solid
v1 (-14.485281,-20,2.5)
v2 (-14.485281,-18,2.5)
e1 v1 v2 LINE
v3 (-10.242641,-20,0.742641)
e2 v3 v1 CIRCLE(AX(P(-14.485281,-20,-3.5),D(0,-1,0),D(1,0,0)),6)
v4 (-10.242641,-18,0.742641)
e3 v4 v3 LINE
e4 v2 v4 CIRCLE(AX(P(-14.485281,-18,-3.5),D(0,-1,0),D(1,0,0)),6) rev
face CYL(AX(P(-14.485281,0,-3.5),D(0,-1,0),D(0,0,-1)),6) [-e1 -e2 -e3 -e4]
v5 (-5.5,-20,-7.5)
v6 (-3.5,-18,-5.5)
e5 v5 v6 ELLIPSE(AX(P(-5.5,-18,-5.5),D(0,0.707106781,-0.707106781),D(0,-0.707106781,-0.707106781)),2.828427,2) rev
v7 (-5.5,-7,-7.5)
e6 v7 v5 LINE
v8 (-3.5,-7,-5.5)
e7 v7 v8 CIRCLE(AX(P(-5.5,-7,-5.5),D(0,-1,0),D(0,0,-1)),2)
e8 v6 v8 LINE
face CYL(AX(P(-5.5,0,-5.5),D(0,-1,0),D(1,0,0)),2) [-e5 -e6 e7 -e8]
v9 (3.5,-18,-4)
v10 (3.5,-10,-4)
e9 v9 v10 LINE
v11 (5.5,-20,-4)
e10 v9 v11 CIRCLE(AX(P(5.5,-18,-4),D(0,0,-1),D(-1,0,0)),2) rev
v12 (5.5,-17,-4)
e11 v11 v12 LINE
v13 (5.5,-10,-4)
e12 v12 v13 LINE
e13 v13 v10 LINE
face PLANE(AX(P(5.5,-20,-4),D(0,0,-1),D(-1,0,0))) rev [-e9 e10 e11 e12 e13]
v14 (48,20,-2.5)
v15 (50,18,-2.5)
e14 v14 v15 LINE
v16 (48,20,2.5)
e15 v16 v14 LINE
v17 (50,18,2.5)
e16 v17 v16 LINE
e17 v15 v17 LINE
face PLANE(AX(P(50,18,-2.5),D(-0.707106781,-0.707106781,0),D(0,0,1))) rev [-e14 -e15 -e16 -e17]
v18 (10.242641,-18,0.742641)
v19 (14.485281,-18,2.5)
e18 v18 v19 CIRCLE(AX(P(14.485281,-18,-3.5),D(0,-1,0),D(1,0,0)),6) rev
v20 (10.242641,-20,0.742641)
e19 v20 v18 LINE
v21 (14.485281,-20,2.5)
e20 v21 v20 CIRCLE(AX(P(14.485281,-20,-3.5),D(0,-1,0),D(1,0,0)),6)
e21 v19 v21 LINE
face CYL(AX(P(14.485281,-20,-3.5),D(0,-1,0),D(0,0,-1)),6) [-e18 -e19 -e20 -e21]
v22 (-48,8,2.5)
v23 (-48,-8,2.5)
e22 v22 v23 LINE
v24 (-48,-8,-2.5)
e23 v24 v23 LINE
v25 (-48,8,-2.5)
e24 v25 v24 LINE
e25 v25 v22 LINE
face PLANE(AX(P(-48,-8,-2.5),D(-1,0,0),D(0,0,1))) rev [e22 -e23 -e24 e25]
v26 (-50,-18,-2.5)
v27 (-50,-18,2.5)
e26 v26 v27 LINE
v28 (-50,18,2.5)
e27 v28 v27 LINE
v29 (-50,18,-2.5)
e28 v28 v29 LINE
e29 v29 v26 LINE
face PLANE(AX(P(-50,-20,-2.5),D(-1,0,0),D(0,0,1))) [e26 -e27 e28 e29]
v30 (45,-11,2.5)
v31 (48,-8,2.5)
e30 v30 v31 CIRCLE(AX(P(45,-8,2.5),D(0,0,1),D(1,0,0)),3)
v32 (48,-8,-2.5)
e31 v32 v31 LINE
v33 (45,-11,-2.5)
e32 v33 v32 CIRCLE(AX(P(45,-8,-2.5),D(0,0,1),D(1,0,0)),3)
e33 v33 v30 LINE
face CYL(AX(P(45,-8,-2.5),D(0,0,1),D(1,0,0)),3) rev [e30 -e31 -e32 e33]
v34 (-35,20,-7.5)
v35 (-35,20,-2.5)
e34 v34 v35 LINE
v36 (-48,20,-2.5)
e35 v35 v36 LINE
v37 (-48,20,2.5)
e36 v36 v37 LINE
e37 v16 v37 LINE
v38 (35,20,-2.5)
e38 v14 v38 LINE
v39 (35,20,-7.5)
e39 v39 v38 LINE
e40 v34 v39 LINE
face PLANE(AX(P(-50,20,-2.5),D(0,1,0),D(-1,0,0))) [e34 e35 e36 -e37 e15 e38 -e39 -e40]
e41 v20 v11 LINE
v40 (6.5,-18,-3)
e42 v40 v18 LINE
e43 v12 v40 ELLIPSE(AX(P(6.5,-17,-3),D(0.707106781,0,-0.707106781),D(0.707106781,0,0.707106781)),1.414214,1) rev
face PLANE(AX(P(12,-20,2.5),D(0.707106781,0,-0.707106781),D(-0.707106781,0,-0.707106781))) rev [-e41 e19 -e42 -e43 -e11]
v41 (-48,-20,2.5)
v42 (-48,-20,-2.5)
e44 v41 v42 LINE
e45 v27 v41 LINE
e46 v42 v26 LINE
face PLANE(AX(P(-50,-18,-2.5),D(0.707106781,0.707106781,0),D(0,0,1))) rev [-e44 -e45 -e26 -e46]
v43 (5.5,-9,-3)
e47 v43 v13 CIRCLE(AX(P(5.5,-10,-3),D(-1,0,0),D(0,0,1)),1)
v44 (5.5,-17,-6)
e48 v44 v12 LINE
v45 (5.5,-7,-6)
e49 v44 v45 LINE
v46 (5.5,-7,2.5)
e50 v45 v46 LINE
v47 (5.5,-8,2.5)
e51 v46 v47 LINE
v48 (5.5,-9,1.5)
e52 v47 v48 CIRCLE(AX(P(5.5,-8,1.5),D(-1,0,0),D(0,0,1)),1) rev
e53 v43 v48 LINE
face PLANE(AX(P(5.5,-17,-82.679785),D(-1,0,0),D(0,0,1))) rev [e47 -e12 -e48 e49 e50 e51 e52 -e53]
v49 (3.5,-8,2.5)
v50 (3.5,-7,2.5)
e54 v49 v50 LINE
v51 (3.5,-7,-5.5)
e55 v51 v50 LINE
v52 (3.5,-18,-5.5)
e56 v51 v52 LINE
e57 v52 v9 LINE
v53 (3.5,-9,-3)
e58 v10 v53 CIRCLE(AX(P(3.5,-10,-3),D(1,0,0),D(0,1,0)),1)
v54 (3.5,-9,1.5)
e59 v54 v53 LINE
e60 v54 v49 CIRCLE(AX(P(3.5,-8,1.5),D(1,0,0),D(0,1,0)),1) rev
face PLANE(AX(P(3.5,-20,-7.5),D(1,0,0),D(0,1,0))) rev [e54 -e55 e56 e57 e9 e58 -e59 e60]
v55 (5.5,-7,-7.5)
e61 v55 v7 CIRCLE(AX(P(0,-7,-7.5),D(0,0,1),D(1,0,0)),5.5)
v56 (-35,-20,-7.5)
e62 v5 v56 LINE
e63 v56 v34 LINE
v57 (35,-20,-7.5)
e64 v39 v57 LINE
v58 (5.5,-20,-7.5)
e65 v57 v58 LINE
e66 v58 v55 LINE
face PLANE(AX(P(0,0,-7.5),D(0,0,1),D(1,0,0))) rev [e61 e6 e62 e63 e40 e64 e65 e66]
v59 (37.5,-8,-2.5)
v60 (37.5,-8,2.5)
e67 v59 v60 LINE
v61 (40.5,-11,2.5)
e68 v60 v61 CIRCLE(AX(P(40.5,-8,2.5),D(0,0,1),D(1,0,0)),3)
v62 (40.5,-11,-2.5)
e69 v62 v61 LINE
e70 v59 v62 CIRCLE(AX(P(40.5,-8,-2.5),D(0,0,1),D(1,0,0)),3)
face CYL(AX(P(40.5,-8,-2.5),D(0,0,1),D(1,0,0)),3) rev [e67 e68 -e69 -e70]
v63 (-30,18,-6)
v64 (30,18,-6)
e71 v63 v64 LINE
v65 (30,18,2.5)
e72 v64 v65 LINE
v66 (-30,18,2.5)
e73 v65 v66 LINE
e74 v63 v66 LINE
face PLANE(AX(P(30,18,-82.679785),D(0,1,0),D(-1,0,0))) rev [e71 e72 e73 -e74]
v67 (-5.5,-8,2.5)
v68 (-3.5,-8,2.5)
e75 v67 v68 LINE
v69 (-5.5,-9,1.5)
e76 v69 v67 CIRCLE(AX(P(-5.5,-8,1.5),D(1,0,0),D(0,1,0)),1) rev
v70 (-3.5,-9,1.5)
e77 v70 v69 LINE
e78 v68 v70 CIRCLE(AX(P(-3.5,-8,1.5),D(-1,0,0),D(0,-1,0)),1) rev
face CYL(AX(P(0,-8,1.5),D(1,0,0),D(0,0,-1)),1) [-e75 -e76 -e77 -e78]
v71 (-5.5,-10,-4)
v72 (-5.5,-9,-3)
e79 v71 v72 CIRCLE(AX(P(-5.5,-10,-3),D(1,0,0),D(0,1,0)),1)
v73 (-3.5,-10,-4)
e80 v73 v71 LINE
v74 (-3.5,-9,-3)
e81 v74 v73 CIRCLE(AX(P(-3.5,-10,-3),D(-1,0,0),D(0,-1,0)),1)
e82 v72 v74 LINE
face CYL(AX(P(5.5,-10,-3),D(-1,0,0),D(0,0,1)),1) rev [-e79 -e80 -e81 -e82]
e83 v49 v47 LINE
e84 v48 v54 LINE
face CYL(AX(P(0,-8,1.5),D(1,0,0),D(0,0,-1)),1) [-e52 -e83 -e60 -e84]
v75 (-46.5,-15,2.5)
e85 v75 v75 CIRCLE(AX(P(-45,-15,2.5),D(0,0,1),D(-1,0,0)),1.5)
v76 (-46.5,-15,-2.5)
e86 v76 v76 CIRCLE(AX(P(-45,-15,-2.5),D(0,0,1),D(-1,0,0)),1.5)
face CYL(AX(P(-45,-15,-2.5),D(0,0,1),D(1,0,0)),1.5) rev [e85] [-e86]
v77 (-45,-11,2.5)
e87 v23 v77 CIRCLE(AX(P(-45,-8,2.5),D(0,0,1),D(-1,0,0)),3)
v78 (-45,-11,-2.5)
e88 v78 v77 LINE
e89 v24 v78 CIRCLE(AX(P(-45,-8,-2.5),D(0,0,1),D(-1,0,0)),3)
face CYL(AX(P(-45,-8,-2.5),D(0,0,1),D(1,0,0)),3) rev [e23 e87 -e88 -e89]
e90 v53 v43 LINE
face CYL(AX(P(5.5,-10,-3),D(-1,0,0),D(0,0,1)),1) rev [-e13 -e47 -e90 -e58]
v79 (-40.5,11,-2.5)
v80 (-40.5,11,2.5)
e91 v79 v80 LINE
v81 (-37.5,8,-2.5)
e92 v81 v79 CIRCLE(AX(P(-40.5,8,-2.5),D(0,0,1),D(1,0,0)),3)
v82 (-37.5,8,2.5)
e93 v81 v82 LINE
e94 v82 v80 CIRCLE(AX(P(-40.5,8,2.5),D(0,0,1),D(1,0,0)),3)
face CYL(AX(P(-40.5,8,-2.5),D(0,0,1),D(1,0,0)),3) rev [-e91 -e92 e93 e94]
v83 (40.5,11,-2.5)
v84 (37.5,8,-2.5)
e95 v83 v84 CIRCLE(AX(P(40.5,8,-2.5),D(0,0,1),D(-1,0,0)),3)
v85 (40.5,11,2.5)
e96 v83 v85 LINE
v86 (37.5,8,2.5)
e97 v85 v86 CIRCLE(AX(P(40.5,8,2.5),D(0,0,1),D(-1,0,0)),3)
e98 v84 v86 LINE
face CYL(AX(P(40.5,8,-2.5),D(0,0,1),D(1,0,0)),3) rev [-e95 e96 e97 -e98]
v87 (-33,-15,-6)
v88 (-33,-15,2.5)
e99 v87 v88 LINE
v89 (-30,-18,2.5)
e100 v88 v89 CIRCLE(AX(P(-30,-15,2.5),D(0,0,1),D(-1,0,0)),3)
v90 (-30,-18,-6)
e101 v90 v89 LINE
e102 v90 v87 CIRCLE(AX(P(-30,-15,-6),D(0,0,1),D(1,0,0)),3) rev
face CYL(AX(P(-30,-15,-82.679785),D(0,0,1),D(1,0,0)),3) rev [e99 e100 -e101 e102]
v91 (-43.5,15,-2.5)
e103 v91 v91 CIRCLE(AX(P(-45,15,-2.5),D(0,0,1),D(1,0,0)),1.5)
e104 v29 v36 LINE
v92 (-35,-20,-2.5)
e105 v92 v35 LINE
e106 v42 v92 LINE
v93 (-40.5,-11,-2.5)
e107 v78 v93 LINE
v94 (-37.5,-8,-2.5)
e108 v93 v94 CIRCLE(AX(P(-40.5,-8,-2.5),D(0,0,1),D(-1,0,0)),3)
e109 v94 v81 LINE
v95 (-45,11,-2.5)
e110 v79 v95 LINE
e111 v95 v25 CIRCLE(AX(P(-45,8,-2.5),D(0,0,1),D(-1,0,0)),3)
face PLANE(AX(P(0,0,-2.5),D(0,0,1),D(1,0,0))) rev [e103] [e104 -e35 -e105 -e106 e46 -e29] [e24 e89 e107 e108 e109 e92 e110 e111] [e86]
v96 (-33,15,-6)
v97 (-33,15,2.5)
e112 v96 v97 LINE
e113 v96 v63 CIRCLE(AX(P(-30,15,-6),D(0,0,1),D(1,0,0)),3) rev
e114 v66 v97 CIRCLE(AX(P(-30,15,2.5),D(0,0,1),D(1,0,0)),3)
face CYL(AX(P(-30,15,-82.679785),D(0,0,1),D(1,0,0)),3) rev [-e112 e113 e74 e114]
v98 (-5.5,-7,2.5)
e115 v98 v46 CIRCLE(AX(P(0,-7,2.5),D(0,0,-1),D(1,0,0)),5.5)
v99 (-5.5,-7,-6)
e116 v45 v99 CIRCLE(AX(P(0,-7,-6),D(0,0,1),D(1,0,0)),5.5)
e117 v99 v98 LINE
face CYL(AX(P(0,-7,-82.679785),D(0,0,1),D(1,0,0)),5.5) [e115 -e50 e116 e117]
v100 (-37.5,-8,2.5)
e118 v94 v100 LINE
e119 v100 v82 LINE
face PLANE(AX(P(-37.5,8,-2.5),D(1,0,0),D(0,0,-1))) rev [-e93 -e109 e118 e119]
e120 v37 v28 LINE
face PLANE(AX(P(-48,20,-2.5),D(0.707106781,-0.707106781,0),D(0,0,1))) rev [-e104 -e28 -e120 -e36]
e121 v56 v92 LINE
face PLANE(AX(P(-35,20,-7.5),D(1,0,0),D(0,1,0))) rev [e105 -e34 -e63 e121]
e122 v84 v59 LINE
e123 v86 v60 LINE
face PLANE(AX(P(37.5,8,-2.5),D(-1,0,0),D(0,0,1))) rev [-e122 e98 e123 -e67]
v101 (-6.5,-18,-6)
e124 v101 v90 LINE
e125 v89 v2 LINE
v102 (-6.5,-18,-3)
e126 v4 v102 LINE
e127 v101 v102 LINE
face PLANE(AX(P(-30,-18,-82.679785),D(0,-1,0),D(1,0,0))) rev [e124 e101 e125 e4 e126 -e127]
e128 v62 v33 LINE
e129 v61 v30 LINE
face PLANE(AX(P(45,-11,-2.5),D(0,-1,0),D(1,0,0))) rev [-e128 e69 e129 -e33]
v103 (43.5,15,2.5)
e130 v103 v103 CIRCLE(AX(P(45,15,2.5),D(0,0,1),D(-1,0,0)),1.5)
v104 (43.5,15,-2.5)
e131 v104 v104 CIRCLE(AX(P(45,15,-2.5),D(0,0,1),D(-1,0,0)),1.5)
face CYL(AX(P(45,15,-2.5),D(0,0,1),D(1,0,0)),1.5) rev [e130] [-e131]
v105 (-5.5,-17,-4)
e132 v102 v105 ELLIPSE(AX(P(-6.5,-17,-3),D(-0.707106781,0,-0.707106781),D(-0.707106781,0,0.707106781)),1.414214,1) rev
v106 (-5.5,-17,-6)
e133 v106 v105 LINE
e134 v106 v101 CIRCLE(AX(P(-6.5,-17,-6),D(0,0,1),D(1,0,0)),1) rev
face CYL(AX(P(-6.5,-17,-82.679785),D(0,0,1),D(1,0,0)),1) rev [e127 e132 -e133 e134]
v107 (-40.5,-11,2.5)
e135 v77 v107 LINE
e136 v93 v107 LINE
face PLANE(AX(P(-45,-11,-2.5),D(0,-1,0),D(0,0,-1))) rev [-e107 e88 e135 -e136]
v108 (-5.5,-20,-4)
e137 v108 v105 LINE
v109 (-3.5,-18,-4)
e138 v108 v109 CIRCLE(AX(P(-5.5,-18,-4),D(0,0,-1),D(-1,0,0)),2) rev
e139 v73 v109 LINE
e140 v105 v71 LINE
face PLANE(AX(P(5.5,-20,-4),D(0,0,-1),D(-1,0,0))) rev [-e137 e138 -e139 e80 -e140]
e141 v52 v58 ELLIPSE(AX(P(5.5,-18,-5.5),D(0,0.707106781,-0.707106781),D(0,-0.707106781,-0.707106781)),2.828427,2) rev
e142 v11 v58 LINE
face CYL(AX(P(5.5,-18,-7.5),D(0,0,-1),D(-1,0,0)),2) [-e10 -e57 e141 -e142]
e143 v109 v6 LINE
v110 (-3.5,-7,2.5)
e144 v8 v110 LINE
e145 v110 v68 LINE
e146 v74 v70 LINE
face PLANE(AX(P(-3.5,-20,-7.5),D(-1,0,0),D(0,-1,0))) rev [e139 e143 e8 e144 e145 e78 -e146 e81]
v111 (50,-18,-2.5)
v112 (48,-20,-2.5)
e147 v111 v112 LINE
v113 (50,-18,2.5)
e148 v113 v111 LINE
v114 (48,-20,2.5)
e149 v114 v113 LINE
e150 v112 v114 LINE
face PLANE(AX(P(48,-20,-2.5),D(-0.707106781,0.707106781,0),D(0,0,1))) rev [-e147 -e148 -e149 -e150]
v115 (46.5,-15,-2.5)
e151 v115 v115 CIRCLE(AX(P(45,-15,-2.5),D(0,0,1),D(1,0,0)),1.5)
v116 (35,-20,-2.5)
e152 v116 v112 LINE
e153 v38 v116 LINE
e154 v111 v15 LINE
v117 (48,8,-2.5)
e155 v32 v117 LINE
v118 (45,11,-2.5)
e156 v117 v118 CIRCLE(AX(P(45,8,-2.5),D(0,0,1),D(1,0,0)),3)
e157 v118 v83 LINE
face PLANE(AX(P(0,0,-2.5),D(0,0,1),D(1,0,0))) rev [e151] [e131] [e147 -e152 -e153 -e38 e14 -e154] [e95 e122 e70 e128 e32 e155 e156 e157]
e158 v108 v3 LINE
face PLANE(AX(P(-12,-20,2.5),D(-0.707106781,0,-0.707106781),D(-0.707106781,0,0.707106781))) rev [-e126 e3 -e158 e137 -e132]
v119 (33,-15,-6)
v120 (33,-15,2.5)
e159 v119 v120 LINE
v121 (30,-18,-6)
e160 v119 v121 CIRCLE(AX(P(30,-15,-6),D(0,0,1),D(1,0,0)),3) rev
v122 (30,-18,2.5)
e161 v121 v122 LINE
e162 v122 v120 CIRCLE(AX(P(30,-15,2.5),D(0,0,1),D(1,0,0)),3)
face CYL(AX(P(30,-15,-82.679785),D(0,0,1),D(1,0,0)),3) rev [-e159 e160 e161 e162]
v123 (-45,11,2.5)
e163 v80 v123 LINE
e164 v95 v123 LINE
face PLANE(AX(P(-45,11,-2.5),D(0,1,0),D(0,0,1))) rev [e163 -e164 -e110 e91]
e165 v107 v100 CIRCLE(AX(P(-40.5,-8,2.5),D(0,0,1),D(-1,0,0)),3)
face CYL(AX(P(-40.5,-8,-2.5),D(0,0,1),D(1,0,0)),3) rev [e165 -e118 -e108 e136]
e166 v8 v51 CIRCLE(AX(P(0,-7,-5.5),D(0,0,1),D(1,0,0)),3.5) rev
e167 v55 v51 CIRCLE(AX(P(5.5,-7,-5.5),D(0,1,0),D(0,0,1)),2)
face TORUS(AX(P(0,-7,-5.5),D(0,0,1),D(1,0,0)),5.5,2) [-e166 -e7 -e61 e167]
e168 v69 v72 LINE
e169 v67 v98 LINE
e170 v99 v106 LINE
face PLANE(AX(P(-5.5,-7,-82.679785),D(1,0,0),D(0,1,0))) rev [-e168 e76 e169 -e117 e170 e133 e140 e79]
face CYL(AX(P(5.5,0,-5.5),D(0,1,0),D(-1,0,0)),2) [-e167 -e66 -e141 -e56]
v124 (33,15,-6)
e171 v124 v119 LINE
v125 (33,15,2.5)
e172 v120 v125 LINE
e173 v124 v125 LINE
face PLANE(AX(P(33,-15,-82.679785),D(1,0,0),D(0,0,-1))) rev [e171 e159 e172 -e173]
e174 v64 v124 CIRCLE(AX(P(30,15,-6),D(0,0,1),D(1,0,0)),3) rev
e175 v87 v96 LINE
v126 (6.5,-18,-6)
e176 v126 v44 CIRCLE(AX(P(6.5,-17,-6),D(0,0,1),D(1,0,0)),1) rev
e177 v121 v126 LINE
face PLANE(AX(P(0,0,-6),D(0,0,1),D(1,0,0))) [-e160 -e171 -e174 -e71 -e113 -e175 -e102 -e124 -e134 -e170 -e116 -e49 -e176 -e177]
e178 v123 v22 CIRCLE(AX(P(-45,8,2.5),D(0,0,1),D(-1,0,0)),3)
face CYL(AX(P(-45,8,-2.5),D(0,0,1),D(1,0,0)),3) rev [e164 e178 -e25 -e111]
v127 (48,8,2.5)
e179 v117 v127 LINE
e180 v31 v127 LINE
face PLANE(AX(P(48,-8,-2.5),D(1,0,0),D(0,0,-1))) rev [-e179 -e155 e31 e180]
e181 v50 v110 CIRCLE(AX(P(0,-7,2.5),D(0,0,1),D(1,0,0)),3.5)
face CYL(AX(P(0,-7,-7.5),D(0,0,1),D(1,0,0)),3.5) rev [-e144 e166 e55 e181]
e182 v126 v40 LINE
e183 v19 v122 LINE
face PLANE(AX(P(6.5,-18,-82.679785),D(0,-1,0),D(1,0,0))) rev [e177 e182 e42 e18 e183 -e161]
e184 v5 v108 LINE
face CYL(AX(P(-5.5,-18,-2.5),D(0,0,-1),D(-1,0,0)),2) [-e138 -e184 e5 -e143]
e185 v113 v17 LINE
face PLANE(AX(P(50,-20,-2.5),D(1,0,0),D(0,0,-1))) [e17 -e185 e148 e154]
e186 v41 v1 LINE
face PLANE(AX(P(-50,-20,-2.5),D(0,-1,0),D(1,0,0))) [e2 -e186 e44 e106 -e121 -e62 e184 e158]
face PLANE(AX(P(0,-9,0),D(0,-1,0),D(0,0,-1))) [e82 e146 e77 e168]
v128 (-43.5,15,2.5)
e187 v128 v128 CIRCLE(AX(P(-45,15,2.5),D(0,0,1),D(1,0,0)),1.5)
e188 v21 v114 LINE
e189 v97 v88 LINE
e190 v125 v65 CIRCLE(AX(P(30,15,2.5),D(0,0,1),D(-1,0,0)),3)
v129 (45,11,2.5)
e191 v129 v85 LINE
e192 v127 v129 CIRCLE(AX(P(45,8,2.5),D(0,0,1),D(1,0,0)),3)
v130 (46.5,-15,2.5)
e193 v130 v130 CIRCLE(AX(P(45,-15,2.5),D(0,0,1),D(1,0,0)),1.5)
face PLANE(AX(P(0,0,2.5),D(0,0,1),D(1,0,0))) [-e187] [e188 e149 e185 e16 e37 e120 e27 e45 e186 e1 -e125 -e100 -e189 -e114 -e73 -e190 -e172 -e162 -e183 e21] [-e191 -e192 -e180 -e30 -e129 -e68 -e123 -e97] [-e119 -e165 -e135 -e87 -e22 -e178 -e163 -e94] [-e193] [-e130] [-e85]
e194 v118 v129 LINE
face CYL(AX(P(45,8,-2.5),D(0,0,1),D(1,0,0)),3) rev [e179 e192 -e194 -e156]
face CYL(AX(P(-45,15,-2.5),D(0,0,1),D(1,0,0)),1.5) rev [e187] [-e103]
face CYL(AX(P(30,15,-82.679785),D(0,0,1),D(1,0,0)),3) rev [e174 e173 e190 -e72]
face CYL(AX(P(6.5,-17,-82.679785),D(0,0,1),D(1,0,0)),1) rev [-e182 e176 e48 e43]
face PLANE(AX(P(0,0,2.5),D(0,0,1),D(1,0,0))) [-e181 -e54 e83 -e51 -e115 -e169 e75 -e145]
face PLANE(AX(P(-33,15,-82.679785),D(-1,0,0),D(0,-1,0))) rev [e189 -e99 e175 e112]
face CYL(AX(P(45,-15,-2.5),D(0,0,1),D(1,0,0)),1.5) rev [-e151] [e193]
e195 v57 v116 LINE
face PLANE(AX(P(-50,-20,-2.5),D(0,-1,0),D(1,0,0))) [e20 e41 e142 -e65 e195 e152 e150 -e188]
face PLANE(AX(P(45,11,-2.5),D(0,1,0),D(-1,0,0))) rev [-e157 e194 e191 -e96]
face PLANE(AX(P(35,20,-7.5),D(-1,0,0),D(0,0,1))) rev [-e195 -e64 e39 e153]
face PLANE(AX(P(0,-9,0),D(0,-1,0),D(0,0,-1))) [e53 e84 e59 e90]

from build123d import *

# Parameters (mm, degrees)
AUFSATZ_LINEAR_AUSTRAGEN1_DEPTH      = 2.5
AUFSATZ_LINEAR_AUSTRAGEN1_DEPTH_BACK = 2.5
SKIZZE1_W                            = 100
SKIZZE1_H                            = 40
SCHNITT_LINEAR_AUSTRAGEN1_DEPTH      = 54.909646632
SCHNITT_LINEAR_AUSTRAGEN1_DEPTH_BACK = 54.909646632
SKIZZE2_R                            = 1.5
SCHNITT_LINEAR_AUSTRAGEN2_DEPTH      = 54.909646632
SCHNITT_LINEAR_AUSTRAGEN2_DEPTH_BACK = 54.909646632
SKIZZE7_W                            = 70
SKIZZE7_H                            = 40
AUFSATZ_LINEAR_AUSTRAGEN3_DEPTH      = 5
FASE1_SIZE                           = 2
SCHNITT_LINEAR_AUSTRAGEN7_DEPTH      = 55.371407927
SCHNITT_LINEAR_AUSTRAGEN7_DEPTH_BACK = 55.371407927
VERRUNDUNG1_R                        = 2
SCHNITT_LINEAR_AUSTRAGEN6_DEPTH      = 8.5
VERRUNDUNG2_R                        = 2
SCHNITT_LINEAR_AUSTRAGEN8_DEPTH      = 59.285933123
VERRUNDUNG3_R                        = 1
VERRUNDUNG4_R                        = 6


with BuildPart() as part:
    # Skizze1 → Aufsatz-Linear austragen1 (new, two sides: drawn at the far end of the back side and taken through both)
    with BuildSketch(Plane.XY.offset(-AUFSATZ_LINEAR_AUSTRAGEN1_DEPTH_BACK)):
        Rectangle(SKIZZE1_W, SKIZZE1_H)
    extrude(amount=AUFSATZ_LINEAR_AUSTRAGEN1_DEPTH + AUFSATZ_LINEAR_AUSTRAGEN1_DEPTH_BACK)

    # Skizze2 → Schnitt-Linear austragen1 (cut, two sides: drawn at the far end of the back side and taken through both)
    with BuildSketch(Plane.XY.offset(-SCHNITT_LINEAR_AUSTRAGEN1_DEPTH_BACK)):
        with Locations((-45, 15)):
            Circle(SKIZZE2_R)
        with Locations(Location((-45, -15, 0), (0, 0, 180))):
            Circle(SKIZZE2_R)
        with Locations((45, -15)):
            Circle(SKIZZE2_R)
        with Locations(Location((45, 15, 0), (0, 0, 180))):
            Circle(SKIZZE2_R)
    extrude(amount=SCHNITT_LINEAR_AUSTRAGEN1_DEPTH + SCHNITT_LINEAR_AUSTRAGEN1_DEPTH_BACK, mode=Mode.SUBTRACT)

    # Skizze4 → Schnitt-Linear austragen2 (cut, two sides: drawn at the far end of the back side and taken through both)
    with BuildSketch(Plane.XY.offset(-SCHNITT_LINEAR_AUSTRAGEN2_DEPTH_BACK)):
        with BuildLine():
            Line((-48, -8), (-48, 8))
            ThreePointArc((-48, 8), (-47.121320344, 10.121320344), (-45, 11))
            Line((-45, 11), (-40.5, 11))
            ThreePointArc((-40.5, 11), (-38.378679656, 10.121320344), (-37.5, 8))
            Line((-37.5, 8), (-37.5, -8))
            ThreePointArc((-37.5, -8), (-38.378679656, -10.121320344), (-40.5, -11))
            Line((-40.5, -11), (-45, -11))
            ThreePointArc((-45, -11), (-47.121320344, -10.121320344), (-48, -8))
        make_face()
        with BuildLine():
            Line((45, -11), (40.5, -11))
            ThreePointArc((40.5, -11), (38.378679656, -10.121320344), (37.5, -8))
            Line((37.5, -8), (37.5, 8))
            ThreePointArc((37.5, 8), (38.378679656, 10.121320344), (40.5, 11))
            Line((40.5, 11), (45, 11))
            ThreePointArc((45, 11), (47.121320344, 10.121320344), (48, 8))
            Line((48, 8), (48, -8))
            ThreePointArc((48, -8), (47.121320344, -10.121320344), (45, -11))
        make_face()
    extrude(amount=SCHNITT_LINEAR_AUSTRAGEN2_DEPTH + SCHNITT_LINEAR_AUSTRAGEN2_DEPTH_BACK, mode=Mode.SUBTRACT)

    # Skizze7 → Aufsatz-Linear austragen3 (add)
    with BuildSketch(Plane(origin=(0, 0, -2.5), x_dir=(-1, 0, 0), z_dir=(0, 0, -1))):
        Rectangle(SKIZZE7_W, SKIZZE7_H)
    extrude(amount=AUFSATZ_LINEAR_AUSTRAGEN3_DEPTH)

    # Fase1
    fase1_edges = [part.edges().sort_by_distance(p)[0] for p in [
        (50, 20, 0),
        (50, -20, 0),
        (-50, -20, 0),
        (-50, 20, 0),
    ]]
    chamfer(fase1_edges, length=FASE1_SIZE)

    # Skizze9 → Schnitt-Linear austragen7 (cut, two sides: drawn at the far end of the back side and taken through both)
    with BuildSketch(Plane.XY.offset(-SCHNITT_LINEAR_AUSTRAGEN7_DEPTH_BACK)):
        with BuildLine():
            Line((-3.5, -20), (3.5, -20))
            Line((3.5, -20), (3.5, -7))
            ThreePointArc((3.5, -7), (0, -3.5), (-3.5, -7))
            Line((-3.5, -7), (-3.5, -20))
        make_face()
    extrude(amount=SCHNITT_LINEAR_AUSTRAGEN7_DEPTH + SCHNITT_LINEAR_AUSTRAGEN7_DEPTH_BACK, mode=Mode.SUBTRACT)

    # Verrundung1
    verrundung1_edges = [part.edges().sort_by_distance(p)[0] for p in [
        (3.5, -20, -2.5),
        (-3.5, -20, -2.5),
    ]]
    fillet(verrundung1_edges, radius=VERRUNDUNG1_R)

    # Skizze8 → Schnitt-Linear austragen6 (cut)
    with BuildSketch(Plane.XY.offset(2.5)):
        with BuildLine():
            Line((6.5, -18), (30, -18))
            ThreePointArc((30, -18), (32.121320344, -17.121320344), (33, -15))
            Line((33, -15), (33, 15))
            ThreePointArc((33, 15), (32.121320344, 17.121320344), (30, 18))
            Line((30, 18), (-30, 18))
            ThreePointArc((-30, 18), (-32.121320344, 17.121320344), (-33, 15))
            Line((-33, 15), (-33, -15))
            ThreePointArc((-33, -15), (-32.121320344, -17.121320344), (-30, -18))
            Line((-30, -18), (-6.5, -18))
            ThreePointArc((-6.5, -18), (-5.792893219, -17.707106781), (-5.5, -17))
            Line((-5.5, -17), (-5.5, -7))
            ThreePointArc((-5.5, -7), (0, -1.5), (5.5, -7))
            Line((5.5, -7), (5.5, -17))
            ThreePointArc((5.5, -17), (5.792893219, -17.707106781), (6.5, -18))
        make_face()
    extrude(amount=-SCHNITT_LINEAR_AUSTRAGEN6_DEPTH, mode=Mode.SUBTRACT)

    # Verrundung2
    # the kernel refuses this fillet: 2 mm, written as the material it takes off along each edge
    with BuildSketch(Plane(origin=(-3.5, -7, -7.5), x_dir=(0, 0, 1), z_dir=(0, -1, 0)), Plane(origin=(3.5, -23, -7.5), x_dir=(0, 0, 1), z_dir=(0, 1, 0))) as verrundung2_piece_1:
        with BuildLine():
            CenterArc((VERRUNDUNG2_R, VERRUNDUNG2_R), VERRUNDUNG2_R, 180, 90)
            Line((0, VERRUNDUNG2_R), (0, 0))
            Line((0, 0), (VERRUNDUNG2_R, 0))
        make_face()
    extrude(amount=16, mode=Mode.SUBTRACT)
    with BuildSketch(Plane(origin=(0, -7, -7.5), x_dir=(-1, 0, 0), z_dir=(0, -1, 0))) as verrundung2_piece_2:
        with BuildLine():
            CenterArc((3.5 + VERRUNDUNG2_R, -VERRUNDUNG2_R), VERRUNDUNG2_R, 90, 90)
            Line((3.5 + VERRUNDUNG2_R, 0), (3.5, 0))
            Line((3.5, 0), (3.5, -VERRUNDUNG2_R))
        make_face()
    revolve(axis=Axis((0, -7, -7.5), (0, 0, -1)), revolution_arc=180, mode=Mode.SUBTRACT)

    # Skizze10 → Schnitt-Linear austragen8 (cut, through all)
    with BuildSketch(Plane(origin=(0, -9, 0), x_dir=(1, 0, 0), z_dir=(0, 1, 0))):
        Polygon((12, -2.5), (5.5, 4), (-5.5, 4), (-12, -2.5), align=None)
    extrude(amount=-SCHNITT_LINEAR_AUSTRAGEN8_DEPTH, mode=Mode.SUBTRACT)

    # Verrundung3
    verrundung3_edges = [part.edges().sort_by_distance(p)[0] for p in [
        (4.5, -9, 2.5),
        (4.5, -9, -4),
        (-4.5, -9, -4),
        (-4.5, -9, 2.5),
    ]]
    fillet(verrundung3_edges, radius=VERRUNDUNG3_R)

    # Verrundung4
    verrundung4_edges = [part.edges().sort_by_distance(p)[0] for p in [
        (12, -19, 2.5),
        (-12, -19, 2.5),
    ]]
    fillet(verrundung4_edges, radius=VERRUNDUNG4_R)


solid = part.part
